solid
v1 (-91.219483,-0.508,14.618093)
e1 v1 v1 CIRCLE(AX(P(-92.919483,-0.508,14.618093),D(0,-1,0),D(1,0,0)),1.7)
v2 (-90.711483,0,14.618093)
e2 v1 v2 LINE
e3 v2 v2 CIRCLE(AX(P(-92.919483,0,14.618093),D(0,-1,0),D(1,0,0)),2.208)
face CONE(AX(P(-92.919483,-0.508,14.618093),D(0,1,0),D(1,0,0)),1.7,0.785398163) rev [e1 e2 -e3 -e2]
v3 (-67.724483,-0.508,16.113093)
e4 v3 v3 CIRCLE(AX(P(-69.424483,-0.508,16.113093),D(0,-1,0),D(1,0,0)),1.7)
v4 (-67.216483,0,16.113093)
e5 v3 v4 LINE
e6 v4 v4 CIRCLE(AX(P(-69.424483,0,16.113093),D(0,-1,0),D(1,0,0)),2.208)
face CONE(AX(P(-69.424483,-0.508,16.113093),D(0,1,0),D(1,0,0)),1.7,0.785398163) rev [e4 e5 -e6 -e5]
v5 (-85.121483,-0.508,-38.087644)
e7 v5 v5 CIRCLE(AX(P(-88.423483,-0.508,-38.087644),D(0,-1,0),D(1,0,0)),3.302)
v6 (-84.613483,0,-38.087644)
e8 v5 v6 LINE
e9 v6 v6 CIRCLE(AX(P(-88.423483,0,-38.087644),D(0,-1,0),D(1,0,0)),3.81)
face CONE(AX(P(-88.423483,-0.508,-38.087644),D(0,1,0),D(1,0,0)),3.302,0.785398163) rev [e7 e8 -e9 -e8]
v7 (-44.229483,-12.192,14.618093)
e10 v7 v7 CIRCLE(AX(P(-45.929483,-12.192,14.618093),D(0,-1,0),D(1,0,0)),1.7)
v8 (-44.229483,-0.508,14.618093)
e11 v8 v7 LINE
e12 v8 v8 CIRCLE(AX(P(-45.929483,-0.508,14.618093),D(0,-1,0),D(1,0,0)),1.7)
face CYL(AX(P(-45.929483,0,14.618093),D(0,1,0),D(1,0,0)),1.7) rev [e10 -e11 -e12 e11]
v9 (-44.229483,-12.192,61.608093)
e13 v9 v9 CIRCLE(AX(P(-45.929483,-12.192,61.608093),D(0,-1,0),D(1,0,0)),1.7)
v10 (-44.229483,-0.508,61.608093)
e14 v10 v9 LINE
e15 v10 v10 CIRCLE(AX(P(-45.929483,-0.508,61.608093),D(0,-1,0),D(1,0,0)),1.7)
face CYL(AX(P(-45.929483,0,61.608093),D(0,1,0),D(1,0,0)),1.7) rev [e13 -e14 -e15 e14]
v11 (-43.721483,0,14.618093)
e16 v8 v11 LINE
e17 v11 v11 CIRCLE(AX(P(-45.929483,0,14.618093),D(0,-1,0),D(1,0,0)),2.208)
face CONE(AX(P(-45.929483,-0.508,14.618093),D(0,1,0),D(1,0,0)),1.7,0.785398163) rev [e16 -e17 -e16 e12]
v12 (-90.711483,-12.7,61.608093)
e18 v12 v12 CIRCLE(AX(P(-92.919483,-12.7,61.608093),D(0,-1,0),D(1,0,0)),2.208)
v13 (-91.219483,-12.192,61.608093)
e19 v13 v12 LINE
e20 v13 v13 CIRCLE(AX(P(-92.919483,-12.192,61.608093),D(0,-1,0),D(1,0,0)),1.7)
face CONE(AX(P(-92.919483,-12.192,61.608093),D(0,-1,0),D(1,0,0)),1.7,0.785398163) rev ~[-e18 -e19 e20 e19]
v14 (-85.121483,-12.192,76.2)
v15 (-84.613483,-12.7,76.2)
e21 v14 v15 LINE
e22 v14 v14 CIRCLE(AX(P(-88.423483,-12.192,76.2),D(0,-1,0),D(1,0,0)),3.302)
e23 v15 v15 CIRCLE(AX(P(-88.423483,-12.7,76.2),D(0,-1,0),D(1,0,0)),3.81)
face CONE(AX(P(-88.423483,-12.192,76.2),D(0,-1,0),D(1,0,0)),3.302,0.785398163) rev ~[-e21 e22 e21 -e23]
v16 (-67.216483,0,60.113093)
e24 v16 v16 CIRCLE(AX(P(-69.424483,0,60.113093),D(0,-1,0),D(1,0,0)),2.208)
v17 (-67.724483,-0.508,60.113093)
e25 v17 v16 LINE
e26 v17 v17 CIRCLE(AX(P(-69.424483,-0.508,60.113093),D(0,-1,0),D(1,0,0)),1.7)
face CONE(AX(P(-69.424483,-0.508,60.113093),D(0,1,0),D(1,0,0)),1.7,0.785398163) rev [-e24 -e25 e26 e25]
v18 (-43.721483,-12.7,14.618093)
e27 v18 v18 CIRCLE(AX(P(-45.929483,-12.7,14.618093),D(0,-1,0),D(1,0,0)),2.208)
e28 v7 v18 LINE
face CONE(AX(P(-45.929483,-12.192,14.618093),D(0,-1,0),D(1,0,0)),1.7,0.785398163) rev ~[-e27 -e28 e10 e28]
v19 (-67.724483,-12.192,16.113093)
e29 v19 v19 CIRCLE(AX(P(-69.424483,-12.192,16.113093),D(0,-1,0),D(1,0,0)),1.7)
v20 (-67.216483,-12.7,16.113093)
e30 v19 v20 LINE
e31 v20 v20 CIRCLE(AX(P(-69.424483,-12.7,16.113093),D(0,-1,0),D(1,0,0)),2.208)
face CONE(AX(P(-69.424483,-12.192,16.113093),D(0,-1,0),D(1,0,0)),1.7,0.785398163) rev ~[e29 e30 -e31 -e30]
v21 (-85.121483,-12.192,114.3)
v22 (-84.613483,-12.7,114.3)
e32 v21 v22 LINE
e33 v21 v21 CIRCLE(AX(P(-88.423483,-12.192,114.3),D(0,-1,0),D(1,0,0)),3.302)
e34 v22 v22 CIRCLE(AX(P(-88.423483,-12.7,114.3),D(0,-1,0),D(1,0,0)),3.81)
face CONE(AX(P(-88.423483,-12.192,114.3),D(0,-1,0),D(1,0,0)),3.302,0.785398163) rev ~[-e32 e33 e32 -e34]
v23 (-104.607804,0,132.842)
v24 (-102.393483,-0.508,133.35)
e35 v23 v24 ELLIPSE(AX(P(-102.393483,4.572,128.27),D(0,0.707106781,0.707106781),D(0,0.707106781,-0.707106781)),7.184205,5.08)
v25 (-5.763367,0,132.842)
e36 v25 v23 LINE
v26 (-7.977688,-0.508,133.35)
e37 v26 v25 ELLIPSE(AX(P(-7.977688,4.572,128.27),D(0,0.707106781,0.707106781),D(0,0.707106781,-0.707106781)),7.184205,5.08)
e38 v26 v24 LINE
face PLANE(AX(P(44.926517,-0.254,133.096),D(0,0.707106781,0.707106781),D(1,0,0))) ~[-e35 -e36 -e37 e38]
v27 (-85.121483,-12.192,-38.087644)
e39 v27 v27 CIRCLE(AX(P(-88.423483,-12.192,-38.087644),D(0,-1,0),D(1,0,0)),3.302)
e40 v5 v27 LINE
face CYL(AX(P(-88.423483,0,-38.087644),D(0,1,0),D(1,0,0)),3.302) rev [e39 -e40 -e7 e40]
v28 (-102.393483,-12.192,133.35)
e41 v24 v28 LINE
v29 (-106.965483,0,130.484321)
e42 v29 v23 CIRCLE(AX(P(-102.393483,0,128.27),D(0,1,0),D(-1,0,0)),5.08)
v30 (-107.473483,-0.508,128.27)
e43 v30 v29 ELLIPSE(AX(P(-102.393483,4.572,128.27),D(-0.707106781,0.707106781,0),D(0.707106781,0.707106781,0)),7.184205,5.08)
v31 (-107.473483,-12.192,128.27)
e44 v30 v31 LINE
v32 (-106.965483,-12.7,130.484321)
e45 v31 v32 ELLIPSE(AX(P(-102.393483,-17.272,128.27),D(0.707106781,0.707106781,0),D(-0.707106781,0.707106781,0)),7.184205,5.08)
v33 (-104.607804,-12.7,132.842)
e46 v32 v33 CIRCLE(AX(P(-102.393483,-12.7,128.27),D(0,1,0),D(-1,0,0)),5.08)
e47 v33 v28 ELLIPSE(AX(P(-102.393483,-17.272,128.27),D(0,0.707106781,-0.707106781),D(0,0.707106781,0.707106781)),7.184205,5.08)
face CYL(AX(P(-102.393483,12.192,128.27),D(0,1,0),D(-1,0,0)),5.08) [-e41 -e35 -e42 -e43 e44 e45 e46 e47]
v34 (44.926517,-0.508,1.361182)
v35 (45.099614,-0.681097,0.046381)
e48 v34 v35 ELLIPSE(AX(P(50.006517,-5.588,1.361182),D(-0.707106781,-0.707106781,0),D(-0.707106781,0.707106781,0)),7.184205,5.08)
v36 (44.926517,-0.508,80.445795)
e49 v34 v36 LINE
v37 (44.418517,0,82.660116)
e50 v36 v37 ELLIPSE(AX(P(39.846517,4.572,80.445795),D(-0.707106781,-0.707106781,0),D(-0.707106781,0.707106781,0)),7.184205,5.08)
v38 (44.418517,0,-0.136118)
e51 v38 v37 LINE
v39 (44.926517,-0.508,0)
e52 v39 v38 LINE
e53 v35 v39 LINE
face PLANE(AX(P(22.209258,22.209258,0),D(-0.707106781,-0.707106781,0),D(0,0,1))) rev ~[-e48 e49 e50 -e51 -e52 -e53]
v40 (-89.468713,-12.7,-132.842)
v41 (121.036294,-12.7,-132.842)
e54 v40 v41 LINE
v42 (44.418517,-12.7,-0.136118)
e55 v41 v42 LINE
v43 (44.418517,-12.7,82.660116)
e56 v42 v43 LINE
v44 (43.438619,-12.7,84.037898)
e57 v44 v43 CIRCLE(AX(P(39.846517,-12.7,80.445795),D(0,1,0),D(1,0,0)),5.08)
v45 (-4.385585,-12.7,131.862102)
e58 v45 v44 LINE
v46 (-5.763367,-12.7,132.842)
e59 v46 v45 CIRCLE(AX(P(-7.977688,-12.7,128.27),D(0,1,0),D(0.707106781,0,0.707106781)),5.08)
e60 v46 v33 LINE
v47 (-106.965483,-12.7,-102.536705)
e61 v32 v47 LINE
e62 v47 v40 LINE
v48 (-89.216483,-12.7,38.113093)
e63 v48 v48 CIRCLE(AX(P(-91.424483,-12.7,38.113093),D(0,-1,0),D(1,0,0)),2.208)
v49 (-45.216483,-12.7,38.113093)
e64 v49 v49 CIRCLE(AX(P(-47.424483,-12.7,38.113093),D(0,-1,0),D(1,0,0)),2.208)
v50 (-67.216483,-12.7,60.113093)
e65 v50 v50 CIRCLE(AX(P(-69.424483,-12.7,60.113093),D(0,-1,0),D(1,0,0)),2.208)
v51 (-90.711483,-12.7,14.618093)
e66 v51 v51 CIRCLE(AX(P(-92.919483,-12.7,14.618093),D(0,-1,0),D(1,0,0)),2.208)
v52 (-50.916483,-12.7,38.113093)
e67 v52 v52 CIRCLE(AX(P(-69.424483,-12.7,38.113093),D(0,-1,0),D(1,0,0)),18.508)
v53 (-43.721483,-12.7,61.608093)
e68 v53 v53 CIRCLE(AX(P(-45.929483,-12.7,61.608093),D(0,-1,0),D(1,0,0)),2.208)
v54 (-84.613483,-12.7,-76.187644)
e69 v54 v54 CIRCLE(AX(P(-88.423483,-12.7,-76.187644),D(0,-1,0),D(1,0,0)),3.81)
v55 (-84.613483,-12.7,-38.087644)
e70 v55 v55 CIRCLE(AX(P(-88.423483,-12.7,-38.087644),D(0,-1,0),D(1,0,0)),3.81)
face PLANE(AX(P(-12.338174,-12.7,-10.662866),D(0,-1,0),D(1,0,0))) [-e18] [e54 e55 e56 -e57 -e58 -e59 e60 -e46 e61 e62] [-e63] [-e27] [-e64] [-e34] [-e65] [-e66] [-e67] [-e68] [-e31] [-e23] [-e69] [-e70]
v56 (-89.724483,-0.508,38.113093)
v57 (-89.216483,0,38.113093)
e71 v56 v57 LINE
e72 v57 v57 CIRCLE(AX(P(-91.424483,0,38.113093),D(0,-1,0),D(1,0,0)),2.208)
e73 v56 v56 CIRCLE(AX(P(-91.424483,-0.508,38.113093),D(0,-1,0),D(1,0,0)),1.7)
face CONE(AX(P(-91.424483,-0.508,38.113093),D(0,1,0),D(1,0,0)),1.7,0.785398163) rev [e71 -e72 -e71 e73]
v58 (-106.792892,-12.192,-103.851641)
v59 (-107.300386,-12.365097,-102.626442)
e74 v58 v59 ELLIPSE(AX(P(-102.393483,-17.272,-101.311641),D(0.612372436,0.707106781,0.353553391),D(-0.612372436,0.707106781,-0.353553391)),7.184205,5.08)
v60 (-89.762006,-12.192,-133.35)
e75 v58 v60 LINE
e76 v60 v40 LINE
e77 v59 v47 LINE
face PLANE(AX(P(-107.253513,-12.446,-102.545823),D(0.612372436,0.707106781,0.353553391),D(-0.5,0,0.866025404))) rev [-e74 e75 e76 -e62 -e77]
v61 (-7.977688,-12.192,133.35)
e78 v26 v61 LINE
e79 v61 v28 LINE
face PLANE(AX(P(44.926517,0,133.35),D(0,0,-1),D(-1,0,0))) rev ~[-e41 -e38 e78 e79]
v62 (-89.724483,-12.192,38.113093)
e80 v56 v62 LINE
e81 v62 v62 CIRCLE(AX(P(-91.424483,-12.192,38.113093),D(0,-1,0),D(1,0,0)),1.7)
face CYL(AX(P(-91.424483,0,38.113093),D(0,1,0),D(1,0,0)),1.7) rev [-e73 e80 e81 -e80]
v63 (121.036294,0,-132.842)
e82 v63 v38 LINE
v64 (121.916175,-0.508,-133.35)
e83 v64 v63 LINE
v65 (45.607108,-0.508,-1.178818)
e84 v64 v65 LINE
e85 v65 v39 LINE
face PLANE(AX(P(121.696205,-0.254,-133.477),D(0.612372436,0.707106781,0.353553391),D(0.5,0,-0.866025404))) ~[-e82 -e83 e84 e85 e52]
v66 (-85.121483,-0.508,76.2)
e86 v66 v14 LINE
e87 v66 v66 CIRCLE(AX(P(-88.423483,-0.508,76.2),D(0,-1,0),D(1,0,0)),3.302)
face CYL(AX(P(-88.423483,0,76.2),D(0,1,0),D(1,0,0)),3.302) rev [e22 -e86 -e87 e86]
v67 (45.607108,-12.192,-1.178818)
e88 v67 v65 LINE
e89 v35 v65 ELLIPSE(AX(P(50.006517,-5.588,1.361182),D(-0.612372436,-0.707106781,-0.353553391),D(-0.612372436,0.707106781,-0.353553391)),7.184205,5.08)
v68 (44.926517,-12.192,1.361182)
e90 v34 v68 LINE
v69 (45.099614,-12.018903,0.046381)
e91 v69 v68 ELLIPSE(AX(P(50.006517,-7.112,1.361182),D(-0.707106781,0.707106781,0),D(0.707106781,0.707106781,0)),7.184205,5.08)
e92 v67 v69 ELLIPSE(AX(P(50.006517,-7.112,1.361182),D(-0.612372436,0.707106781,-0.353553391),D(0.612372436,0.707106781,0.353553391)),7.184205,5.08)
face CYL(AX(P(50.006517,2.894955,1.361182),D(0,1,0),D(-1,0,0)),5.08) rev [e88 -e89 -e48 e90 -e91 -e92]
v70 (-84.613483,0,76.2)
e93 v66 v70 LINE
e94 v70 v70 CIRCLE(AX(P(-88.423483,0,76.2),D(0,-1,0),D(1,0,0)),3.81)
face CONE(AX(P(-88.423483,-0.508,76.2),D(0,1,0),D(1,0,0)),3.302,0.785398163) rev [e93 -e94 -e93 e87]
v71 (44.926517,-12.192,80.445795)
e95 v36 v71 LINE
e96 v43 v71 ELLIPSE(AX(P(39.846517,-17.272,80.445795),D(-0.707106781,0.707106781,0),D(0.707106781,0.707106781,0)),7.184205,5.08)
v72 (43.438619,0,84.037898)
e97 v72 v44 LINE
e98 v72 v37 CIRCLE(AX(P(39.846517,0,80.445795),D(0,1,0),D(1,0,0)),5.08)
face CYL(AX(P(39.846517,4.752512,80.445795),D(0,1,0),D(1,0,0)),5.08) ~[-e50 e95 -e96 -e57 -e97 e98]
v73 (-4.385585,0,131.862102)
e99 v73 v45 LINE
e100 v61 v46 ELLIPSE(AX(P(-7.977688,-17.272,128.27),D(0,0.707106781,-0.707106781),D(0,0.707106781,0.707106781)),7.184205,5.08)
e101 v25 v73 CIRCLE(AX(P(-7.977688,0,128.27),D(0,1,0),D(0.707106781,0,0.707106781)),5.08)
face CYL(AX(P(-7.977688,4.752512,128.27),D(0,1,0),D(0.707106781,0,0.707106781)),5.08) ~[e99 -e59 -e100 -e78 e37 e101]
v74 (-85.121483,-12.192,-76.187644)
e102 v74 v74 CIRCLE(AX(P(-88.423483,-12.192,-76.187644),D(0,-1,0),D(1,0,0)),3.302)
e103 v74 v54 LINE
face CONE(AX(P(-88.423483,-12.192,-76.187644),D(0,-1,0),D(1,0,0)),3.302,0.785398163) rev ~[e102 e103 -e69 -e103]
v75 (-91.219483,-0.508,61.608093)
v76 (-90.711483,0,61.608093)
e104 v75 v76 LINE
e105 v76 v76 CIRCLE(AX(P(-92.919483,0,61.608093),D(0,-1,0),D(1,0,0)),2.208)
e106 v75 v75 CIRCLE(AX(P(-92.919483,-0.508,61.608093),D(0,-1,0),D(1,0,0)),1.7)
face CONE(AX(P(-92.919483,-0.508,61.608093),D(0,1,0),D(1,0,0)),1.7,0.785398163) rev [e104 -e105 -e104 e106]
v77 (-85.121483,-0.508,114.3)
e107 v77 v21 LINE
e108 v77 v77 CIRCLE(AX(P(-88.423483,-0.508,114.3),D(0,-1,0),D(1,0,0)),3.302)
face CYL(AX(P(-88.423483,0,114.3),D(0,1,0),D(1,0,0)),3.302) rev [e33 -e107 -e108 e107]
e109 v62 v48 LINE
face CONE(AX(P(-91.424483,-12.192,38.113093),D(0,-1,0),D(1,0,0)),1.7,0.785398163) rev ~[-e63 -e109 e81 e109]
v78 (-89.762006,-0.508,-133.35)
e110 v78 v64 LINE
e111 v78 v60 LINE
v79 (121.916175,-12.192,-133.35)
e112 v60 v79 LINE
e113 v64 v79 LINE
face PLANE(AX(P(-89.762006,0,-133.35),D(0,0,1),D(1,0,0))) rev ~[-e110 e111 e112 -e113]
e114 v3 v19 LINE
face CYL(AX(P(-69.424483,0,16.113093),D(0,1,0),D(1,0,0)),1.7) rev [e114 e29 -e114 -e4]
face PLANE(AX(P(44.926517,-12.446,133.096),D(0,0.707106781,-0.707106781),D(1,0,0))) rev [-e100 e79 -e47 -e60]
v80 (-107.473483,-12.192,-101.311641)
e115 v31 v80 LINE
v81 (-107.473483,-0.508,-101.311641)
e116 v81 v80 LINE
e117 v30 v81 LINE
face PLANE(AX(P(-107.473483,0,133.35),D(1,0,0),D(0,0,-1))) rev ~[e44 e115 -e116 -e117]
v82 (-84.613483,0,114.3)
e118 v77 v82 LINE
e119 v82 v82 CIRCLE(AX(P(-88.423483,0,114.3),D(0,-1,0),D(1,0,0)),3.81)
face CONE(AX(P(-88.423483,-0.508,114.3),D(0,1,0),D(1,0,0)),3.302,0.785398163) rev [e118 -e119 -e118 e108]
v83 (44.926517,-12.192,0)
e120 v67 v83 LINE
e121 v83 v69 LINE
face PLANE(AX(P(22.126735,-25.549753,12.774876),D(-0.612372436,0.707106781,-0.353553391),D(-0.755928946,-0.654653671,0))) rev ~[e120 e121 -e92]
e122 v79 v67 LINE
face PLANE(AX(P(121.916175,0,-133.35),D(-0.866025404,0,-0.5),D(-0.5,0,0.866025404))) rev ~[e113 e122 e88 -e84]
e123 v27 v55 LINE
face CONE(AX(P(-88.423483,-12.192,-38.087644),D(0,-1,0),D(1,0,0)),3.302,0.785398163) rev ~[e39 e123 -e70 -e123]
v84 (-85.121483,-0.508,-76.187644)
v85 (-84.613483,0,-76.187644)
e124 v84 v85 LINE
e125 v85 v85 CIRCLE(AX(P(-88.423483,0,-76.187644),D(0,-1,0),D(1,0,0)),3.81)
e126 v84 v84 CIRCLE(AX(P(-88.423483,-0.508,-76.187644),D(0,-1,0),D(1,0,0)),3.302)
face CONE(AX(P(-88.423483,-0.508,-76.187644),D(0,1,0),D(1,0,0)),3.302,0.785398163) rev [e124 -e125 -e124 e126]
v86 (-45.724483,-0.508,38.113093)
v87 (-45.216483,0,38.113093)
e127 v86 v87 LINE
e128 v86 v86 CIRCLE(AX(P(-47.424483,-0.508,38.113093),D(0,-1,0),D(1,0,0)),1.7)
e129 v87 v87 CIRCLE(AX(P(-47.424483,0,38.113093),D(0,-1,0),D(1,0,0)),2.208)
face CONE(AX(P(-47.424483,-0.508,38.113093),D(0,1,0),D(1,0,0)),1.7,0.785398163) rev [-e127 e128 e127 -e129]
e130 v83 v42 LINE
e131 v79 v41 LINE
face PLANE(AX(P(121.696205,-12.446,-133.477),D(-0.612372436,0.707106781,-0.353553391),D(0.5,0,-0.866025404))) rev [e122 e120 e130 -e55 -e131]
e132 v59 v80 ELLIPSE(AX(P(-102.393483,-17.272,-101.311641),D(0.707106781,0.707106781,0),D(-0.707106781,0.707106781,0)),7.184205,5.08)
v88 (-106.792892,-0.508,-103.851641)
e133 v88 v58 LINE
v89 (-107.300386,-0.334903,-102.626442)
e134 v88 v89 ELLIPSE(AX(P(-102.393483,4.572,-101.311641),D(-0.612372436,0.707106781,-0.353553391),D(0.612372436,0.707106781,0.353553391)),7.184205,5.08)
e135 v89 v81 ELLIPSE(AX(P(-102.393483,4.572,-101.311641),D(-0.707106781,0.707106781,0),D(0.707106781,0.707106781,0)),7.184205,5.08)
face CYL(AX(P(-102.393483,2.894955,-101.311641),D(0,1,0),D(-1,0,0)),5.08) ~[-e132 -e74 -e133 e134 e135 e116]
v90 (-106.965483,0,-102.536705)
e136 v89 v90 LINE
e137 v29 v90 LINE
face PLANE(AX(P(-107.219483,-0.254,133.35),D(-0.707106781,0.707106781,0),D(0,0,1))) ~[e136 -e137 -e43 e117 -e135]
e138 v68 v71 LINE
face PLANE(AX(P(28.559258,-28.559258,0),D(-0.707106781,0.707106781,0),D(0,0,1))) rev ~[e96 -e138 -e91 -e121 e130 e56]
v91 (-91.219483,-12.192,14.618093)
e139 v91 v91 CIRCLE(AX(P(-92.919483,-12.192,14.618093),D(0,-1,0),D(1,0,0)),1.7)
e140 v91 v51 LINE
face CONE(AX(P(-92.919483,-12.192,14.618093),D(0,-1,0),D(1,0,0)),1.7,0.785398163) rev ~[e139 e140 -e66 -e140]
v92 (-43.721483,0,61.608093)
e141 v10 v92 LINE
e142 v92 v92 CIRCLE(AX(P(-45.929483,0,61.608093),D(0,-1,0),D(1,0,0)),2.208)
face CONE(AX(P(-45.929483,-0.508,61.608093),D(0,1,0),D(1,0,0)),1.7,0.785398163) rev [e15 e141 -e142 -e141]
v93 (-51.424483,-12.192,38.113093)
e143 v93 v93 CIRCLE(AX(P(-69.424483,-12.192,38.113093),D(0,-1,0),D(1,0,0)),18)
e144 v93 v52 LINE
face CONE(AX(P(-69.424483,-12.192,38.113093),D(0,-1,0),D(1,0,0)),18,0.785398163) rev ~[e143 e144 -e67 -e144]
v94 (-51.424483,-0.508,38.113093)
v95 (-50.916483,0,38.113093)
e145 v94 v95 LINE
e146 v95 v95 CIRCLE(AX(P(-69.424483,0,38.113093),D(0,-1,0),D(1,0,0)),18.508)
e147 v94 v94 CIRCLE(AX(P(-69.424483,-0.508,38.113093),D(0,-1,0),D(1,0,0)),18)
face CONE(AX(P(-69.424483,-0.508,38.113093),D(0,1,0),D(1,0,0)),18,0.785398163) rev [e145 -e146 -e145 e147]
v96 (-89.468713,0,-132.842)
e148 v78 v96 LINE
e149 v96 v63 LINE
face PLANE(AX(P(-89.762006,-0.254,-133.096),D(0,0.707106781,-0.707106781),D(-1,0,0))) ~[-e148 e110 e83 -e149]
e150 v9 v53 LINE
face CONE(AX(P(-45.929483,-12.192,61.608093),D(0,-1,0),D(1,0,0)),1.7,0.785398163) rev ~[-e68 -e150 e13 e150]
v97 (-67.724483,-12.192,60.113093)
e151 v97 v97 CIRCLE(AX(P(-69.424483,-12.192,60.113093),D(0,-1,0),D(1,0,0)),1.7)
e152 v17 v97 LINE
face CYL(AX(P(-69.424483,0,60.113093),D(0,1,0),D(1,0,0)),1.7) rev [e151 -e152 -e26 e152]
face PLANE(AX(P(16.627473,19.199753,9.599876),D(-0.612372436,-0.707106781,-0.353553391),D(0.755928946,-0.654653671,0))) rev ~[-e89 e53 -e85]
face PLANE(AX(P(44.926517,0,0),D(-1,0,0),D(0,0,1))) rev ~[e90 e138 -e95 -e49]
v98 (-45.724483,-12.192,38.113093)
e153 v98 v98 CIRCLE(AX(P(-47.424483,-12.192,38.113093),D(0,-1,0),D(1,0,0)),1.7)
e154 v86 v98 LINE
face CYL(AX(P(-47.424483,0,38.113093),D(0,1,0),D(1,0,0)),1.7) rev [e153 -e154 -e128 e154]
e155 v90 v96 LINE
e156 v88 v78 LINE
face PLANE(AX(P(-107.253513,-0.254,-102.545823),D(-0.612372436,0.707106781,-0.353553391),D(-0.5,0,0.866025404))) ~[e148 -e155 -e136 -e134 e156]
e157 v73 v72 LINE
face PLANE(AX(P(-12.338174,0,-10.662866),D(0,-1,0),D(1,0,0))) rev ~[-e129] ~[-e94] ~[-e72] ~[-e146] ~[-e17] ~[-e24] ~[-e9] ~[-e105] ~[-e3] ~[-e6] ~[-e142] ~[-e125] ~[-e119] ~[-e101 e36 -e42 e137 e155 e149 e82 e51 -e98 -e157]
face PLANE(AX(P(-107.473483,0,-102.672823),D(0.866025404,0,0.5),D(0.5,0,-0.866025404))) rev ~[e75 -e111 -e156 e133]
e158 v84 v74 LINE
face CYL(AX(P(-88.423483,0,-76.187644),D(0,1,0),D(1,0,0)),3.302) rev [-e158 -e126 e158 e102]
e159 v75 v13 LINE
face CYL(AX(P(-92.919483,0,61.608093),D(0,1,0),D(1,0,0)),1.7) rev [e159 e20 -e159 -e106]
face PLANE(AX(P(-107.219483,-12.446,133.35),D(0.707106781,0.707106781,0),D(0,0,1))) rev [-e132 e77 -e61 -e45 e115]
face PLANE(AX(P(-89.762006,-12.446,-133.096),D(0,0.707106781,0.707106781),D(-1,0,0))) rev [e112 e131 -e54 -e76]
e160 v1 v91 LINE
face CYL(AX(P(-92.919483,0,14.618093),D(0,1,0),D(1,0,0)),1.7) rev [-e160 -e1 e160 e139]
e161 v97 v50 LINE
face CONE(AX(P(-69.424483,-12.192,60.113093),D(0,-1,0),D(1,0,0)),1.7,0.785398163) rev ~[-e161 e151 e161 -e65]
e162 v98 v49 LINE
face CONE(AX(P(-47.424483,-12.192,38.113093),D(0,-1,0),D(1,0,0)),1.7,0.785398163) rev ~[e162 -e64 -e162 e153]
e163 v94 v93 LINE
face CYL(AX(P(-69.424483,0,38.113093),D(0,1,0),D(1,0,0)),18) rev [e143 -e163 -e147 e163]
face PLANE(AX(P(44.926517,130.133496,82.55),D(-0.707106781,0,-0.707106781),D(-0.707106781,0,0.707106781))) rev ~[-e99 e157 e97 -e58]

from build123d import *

# Parameters (mm, degrees)
F0_R         = 3.302
F0_R_2       = 1.7
F0_R_3       = 18
F1_DEPTH     = 12.7
F2_SIZE      = 0.508
F3_T1_DEPTH  = 272.9669915773
F4_T4_DEPTH  = 18.4899094878
F4_T10_DEPTH = 18.4899094878
F4_T16_DEPTH = 18.4899094878
F4_T24_DEPTH = 18.4899094878
F4_T30_DEPTH = 18.4899094878
F4_T33_DEPTH = 22.2050244844
F4_T35_DEPTH = 18.4899094878
F4_T37_DEPTH = 37.084


# Not quite as in the source:
# - a fillet or chamfer that OpenCascade refuses, or shapes differently, is made with other operations: its cross-section is extruded or revolved along the edge and cut away or added


with BuildPart() as f1:
    # F0 (on Front) → F1 (new body)
    with BuildSketch(Plane.XZ):
        Polygon((44.9265169831, 0), (44.9265169831, 133.35), (-107.4734830169, 133.35), (-107.4734830169, -102.6728227735), (-89.7620064872, -133.35), (121.9161753795, -133.35), align=None)
        with Locations((-88.4234830169, -76.1876442577)):
            Circle(F0_R, mode=Mode.SUBTRACT)
        with Locations((-88.4234830169, -38.0876442577)):
            Circle(F0_R, mode=Mode.SUBTRACT)
        with Locations((-92.9194827628, 14.6180932346)):
            Circle(F0_R_2, mode=Mode.SUBTRACT)
        with Locations((-69.4244827628, 16.1130932346)):
            Circle(F0_R_2, mode=Mode.SUBTRACT)
        with Locations((-45.9294827628, 14.6180932346)):
            Circle(F0_R_2, mode=Mode.SUBTRACT)
        with Locations((-91.4244827628, 38.1130932346)):
            Circle(F0_R_2, mode=Mode.SUBTRACT)
        with Locations((-69.4244827628, 38.1130932346)):
            Circle(F0_R_3, mode=Mode.SUBTRACT)
        with Locations((-92.9194827628, 61.6080932346)):
            Circle(F0_R_2, mode=Mode.SUBTRACT)
        with Locations((-69.4244827628, 60.1130932346)):
            Circle(F0_R_2, mode=Mode.SUBTRACT)
        with Locations((-47.4244827628, 38.1130932346)):
            Circle(F0_R_2, mode=Mode.SUBTRACT)
        with Locations((-45.9294827628, 61.6080932346)):
            Circle(F0_R_2, mode=Mode.SUBTRACT)
        with Locations((-88.4234830169, 76.2)):
            Circle(F0_R, mode=Mode.SUBTRACT)
        with Locations((-88.4234830169, 114.3)):
            Circle(F0_R, mode=Mode.SUBTRACT)
    extrude(amount=F1_DEPTH)

    # F2
    f2_edges = [f1.edges().sort_by_distance(p)[0] for p in [
        (44.926517, -12.7, 66.675),
        (-31.273483, -12.7, 133.35),
        (-107.473483, -12.7, 15.338589),
        (-98.617745, -12.7, -118.011411),
        (16.077084, -12.7, -133.35),
        (83.421346, -12.7, -66.675),
        (-91.725483, -12.7, -76.187644),
        (-91.725483, -12.7, -38.087644),
        (-94.619483, -12.7, 14.618093),
        (-71.124483, -12.7, 16.113093),
        (-47.629483, -12.7, 14.618093),
        (-93.124483, -12.7, 38.113093),
        (-87.424483, -12.7, 38.113093),
        (-94.619483, -12.7, 61.608093),
        (-71.124483, -12.7, 60.113093),
        (-49.124483, -12.7, 38.113093),
        (-47.629483, -12.7, 61.608093),
        (-91.725483, -12.7, 76.2),
        (-91.725483, -12.7, 114.3),
        (44.926517, 0, 66.675),
        (-31.273483, 0, 133.35),
        (-107.473483, 0, 15.338589),
        (-98.617745, 0, -118.011411),
        (16.077084, 0, -133.35),
        (83.421346, 0, -66.675),
        (-91.725483, 0, -76.187644),
        (-91.725483, 0, -38.087644),
        (-94.619483, 0, 14.618093),
        (-71.124483, 0, 16.113093),
        (-47.629483, 0, 14.618093),
        (-93.124483, 0, 38.113093),
        (-87.424483, 0, 38.113093),
        (-94.619483, 0, 61.608093),
        (-71.124483, 0, 60.113093),
        (-49.124483, 0, 38.113093),
        (-47.629483, 0, 61.608093),
        (-91.725483, 0, 76.2),
        (-91.725483, 0, 114.3),
    ]]
    chamfer(f2_edges, length=F2_SIZE)

    # F3: chamfer of 50.8 on 1 edges, made by hand

    # F3_s2 → F3_t1 (cut)
    with BuildSketch(Plane.XZ.offset(-130.1334957887)):
        Polygon((44.9265169831, 82.55), (-5.8734830169, 133.35), (44.9265169831, 133.35), align=None)
    extrude(amount=F3_T1_DEPTH, mode=Mode.SUBTRACT)

    # F4: fillet of radius 5.08 on 5 edges, made by hand


with BuildPart() as f4_tool2:
    # F4_s3 → F4_t4 (new body)
    with BuildSketch(Plane.XZ.offset(-2.8949547439)):
        with BuildLine():
            ThreePointArc((44.9265169831, 1.3611818976), (45.0996137855, 0.0463811484), (45.6071079319, -1.1788181024))
            Line((45.6071079319, -1.1788181024), (44.9265169831, 0))
            Line((44.9265169831, 0), (44.9265169831, 1.3611818976))
        make_face()
    extrude(amount=F4_T4_DEPTH)

    split(bisect_by=Plane(origin=(22.2092584915, 22.2092584915, 0), x_dir=(0, 0, 1), z_dir=(0.7071067812, 0.7071067812, 0)), keep=Keep.TOP)

    split(bisect_by=Plane(origin=(16.6274734161, 19.1997525055, 9.5998762527), x_dir=(0.755928946, -0.6546536707, 0), z_dir=(-0.6123724357, -0.7071067812, -0.3535533906)), keep=Keep.TOP)


with BuildPart() as f1_1:
    add(f1.part)

    # F4_t1: union F4_tool2
    add(f4_tool2.part)


with BuildPart() as f4_tool8:
    # F4_s9 → F4_t10 (new body)
    with BuildSketch(Plane.XZ.offset(-2.8949547439)):
        with BuildLine():
            ThreePointArc((44.9265169831, 1.3611818976), (45.0996137855, 0.0463811484), (45.6071079319, -1.1788181024))
            Line((45.6071079319, -1.1788181024), (44.9265169831, 0))
            Line((44.9265169831, 0), (44.9265169831, 1.3611818976))
        make_face()
    extrude(amount=F4_T10_DEPTH)

    split(bisect_by=Plane(origin=(22.2092584915, 22.2092584915, 0), x_dir=(0, 0, 1), z_dir=(-0.7071067812, -0.7071067812, 0)), keep=Keep.TOP)

    split(bisect_by=Plane(origin=(16.6274734161, 19.1997525055, 9.5998762527), x_dir=(-0.755928946, 0.6546536707, 0), z_dir=(0.6123724357, 0.7071067812, 0.3535533906)), keep=Keep.TOP)


with BuildPart() as f1_2:
    add(f1_1.part)

    # F4_t7: union F4_tool8
    add(f4_tool8.part)


with BuildPart() as f4_tool14:
    # F4_s15 → F4_t16 (new body)
    with BuildSketch(Plane.XZ.offset(-2.8949547439)):
        with BuildLine():
            ThreePointArc((44.9265169831, 1.3611818976), (45.0996137855, 0.0463811484), (45.6071079319, -1.1788181024))
            Line((45.6071079319, -1.1788181024), (44.9265169831, 0))
            Line((44.9265169831, 0), (44.9265169831, 1.3611818976))
        make_face()
    extrude(amount=F4_T16_DEPTH)

    split(bisect_by=Plane(origin=(22.2092584915, 22.2092584915, 0), x_dir=(0, 0, 1), z_dir=(-0.7071067812, -0.7071067812, 0)), keep=Keep.TOP)

    split(bisect_by=Plane(origin=(28.5592584915, -28.5592584915, 0), x_dir=(0, 0, 1), z_dir=(-0.7071067812, 0.7071067812, 0)), keep=Keep.TOP)

    split(bisect_by=Plane(origin=(16.6274734161, 19.1997525055, 9.5998762527), x_dir=(0.755928946, -0.6546536707, 0), z_dir=(-0.6123724357, -0.7071067812, -0.3535533906)), keep=Keep.TOP)

    split(bisect_by=Plane(origin=(22.1267347301, -25.5497525055, 12.7748762527), x_dir=(-0.755928946, -0.6546536707, 0), z_dir=(-0.6123724357, 0.7071067812, -0.3535533906)), keep=Keep.TOP)


with BuildPart() as f1_3:
    add(f1_2.part)

    # F4_t13: union F4_tool14
    add(f4_tool14.part)


with BuildPart() as f4_tool22:
    # F4_s23 → F4_t24 (new body)
    with BuildSketch(Plane.XZ.offset(-2.8949547439)):
        with BuildLine():
            ThreePointArc((44.9265169831, 1.3611818976), (45.0996137855, 0.0463811484), (45.6071079319, -1.1788181024))
            Line((45.6071079319, -1.1788181024), (44.9265169831, 0))
            Line((44.9265169831, 0), (44.9265169831, 1.3611818976))
        make_face()
    extrude(amount=F4_T24_DEPTH)

    split(bisect_by=Plane(origin=(28.5592584915, -28.5592584915, 0), x_dir=(0, 0, 1), z_dir=(0.7071067812, -0.7071067812, 0)), keep=Keep.TOP)

    split(bisect_by=Plane(origin=(22.1267347301, -25.5497525055, 12.7748762527), x_dir=(-0.755928946, -0.6546536707, 0), z_dir=(-0.6123724357, 0.7071067812, -0.3535533906)), keep=Keep.TOP)


with BuildPart() as f1_4:
    add(f1_3.part)

    # F4_t21: union F4_tool22
    add(f4_tool22.part)


with BuildPart() as f4_tool28:
    # F4_s29 → F4_t30 (new body)
    with BuildSketch(Plane.XZ.offset(-2.8949547439)):
        with BuildLine():
            ThreePointArc((44.9265169831, 1.3611818976), (45.0996137855, 0.0463811484), (45.6071079319, -1.1788181024))
            Line((45.6071079319, -1.1788181024), (44.9265169831, 0))
            Line((44.9265169831, 0), (44.9265169831, 1.3611818976))
        make_face()
    extrude(amount=F4_T30_DEPTH)

    split(bisect_by=Plane(origin=(28.5592584915, -28.5592584915, 0), x_dir=(0, 0, 1), z_dir=(-0.7071067812, 0.7071067812, 0)), keep=Keep.TOP)

    split(bisect_by=Plane(origin=(22.1267347301, -25.5497525055, 12.7748762527), x_dir=(0.755928946, 0.6546536707, 0), z_dir=(0.6123724357, -0.7071067812, 0.3535533906)), keep=Keep.TOP)


with BuildPart() as f1_5:
    add(f1_4.part)

    # F4_t27: union F4_tool28
    add(f4_tool28.part)

    # F4_s34 → F4_t33 (cut)
    with BuildSketch(Plane.XZ.offset(-4.7525122422)):
        with BuildLine():
            ThreePointArc((44.9265169831, 80.4457951032), (44.5398250082, 82.3898269396), (43.4386194315, 84.0378975516))
            Line((43.4386194315, 84.0378975516), (44.9265169831, 82.55))
            Line((44.9265169831, 82.55), (44.9265169831, 80.4457951032))
        make_face()
        with BuildLine():
            ThreePointArc((-4.3855854653, 131.8621024484), (-6.0336560773, 132.9633080252), (-7.9776879138, 133.35))
            Line((-7.9776879138, 133.35), (-5.8734830169, 133.35))
            Line((-5.8734830169, 133.35), (-4.3855854653, 131.8621024484))
        make_face()
    extrude(amount=F4_T33_DEPTH, mode=Mode.SUBTRACT)

    # F4_s36 → F4_t35 (cut)
    with BuildSketch(Plane.XZ.offset(-2.8949547439)):
        with BuildLine():
            ThreePointArc((-107.4734830169, -101.3116408759), (-107.3003862145, -102.626441625), (-106.7928920681, -103.8516408759))
            Line((-106.7928920681, -103.8516408759), (-107.4734830169, -102.6728227735))
            Line((-107.4734830169, -102.6728227735), (-107.4734830169, -101.3116408759))
        make_face()
    extrude(amount=F4_T35_DEPTH, mode=Mode.SUBTRACT)

    # F4_s38 → F4_t37 (cut)
    with BuildSketch(Plane.XZ.offset(-12.192)):
        with BuildLine():
            ThreePointArc((-107.4734830169, 128.27), (-105.9855854653, 131.8621024484), (-102.3934830169, 133.35))
            Line((-102.3934830169, 133.35), (-107.4734830169, 133.35))
            Line((-107.4734830169, 133.35), (-107.4734830169, 128.27))
        make_face()
    extrude(amount=F4_T37_DEPTH, mode=Mode.SUBTRACT)


solid = f1_5.part
